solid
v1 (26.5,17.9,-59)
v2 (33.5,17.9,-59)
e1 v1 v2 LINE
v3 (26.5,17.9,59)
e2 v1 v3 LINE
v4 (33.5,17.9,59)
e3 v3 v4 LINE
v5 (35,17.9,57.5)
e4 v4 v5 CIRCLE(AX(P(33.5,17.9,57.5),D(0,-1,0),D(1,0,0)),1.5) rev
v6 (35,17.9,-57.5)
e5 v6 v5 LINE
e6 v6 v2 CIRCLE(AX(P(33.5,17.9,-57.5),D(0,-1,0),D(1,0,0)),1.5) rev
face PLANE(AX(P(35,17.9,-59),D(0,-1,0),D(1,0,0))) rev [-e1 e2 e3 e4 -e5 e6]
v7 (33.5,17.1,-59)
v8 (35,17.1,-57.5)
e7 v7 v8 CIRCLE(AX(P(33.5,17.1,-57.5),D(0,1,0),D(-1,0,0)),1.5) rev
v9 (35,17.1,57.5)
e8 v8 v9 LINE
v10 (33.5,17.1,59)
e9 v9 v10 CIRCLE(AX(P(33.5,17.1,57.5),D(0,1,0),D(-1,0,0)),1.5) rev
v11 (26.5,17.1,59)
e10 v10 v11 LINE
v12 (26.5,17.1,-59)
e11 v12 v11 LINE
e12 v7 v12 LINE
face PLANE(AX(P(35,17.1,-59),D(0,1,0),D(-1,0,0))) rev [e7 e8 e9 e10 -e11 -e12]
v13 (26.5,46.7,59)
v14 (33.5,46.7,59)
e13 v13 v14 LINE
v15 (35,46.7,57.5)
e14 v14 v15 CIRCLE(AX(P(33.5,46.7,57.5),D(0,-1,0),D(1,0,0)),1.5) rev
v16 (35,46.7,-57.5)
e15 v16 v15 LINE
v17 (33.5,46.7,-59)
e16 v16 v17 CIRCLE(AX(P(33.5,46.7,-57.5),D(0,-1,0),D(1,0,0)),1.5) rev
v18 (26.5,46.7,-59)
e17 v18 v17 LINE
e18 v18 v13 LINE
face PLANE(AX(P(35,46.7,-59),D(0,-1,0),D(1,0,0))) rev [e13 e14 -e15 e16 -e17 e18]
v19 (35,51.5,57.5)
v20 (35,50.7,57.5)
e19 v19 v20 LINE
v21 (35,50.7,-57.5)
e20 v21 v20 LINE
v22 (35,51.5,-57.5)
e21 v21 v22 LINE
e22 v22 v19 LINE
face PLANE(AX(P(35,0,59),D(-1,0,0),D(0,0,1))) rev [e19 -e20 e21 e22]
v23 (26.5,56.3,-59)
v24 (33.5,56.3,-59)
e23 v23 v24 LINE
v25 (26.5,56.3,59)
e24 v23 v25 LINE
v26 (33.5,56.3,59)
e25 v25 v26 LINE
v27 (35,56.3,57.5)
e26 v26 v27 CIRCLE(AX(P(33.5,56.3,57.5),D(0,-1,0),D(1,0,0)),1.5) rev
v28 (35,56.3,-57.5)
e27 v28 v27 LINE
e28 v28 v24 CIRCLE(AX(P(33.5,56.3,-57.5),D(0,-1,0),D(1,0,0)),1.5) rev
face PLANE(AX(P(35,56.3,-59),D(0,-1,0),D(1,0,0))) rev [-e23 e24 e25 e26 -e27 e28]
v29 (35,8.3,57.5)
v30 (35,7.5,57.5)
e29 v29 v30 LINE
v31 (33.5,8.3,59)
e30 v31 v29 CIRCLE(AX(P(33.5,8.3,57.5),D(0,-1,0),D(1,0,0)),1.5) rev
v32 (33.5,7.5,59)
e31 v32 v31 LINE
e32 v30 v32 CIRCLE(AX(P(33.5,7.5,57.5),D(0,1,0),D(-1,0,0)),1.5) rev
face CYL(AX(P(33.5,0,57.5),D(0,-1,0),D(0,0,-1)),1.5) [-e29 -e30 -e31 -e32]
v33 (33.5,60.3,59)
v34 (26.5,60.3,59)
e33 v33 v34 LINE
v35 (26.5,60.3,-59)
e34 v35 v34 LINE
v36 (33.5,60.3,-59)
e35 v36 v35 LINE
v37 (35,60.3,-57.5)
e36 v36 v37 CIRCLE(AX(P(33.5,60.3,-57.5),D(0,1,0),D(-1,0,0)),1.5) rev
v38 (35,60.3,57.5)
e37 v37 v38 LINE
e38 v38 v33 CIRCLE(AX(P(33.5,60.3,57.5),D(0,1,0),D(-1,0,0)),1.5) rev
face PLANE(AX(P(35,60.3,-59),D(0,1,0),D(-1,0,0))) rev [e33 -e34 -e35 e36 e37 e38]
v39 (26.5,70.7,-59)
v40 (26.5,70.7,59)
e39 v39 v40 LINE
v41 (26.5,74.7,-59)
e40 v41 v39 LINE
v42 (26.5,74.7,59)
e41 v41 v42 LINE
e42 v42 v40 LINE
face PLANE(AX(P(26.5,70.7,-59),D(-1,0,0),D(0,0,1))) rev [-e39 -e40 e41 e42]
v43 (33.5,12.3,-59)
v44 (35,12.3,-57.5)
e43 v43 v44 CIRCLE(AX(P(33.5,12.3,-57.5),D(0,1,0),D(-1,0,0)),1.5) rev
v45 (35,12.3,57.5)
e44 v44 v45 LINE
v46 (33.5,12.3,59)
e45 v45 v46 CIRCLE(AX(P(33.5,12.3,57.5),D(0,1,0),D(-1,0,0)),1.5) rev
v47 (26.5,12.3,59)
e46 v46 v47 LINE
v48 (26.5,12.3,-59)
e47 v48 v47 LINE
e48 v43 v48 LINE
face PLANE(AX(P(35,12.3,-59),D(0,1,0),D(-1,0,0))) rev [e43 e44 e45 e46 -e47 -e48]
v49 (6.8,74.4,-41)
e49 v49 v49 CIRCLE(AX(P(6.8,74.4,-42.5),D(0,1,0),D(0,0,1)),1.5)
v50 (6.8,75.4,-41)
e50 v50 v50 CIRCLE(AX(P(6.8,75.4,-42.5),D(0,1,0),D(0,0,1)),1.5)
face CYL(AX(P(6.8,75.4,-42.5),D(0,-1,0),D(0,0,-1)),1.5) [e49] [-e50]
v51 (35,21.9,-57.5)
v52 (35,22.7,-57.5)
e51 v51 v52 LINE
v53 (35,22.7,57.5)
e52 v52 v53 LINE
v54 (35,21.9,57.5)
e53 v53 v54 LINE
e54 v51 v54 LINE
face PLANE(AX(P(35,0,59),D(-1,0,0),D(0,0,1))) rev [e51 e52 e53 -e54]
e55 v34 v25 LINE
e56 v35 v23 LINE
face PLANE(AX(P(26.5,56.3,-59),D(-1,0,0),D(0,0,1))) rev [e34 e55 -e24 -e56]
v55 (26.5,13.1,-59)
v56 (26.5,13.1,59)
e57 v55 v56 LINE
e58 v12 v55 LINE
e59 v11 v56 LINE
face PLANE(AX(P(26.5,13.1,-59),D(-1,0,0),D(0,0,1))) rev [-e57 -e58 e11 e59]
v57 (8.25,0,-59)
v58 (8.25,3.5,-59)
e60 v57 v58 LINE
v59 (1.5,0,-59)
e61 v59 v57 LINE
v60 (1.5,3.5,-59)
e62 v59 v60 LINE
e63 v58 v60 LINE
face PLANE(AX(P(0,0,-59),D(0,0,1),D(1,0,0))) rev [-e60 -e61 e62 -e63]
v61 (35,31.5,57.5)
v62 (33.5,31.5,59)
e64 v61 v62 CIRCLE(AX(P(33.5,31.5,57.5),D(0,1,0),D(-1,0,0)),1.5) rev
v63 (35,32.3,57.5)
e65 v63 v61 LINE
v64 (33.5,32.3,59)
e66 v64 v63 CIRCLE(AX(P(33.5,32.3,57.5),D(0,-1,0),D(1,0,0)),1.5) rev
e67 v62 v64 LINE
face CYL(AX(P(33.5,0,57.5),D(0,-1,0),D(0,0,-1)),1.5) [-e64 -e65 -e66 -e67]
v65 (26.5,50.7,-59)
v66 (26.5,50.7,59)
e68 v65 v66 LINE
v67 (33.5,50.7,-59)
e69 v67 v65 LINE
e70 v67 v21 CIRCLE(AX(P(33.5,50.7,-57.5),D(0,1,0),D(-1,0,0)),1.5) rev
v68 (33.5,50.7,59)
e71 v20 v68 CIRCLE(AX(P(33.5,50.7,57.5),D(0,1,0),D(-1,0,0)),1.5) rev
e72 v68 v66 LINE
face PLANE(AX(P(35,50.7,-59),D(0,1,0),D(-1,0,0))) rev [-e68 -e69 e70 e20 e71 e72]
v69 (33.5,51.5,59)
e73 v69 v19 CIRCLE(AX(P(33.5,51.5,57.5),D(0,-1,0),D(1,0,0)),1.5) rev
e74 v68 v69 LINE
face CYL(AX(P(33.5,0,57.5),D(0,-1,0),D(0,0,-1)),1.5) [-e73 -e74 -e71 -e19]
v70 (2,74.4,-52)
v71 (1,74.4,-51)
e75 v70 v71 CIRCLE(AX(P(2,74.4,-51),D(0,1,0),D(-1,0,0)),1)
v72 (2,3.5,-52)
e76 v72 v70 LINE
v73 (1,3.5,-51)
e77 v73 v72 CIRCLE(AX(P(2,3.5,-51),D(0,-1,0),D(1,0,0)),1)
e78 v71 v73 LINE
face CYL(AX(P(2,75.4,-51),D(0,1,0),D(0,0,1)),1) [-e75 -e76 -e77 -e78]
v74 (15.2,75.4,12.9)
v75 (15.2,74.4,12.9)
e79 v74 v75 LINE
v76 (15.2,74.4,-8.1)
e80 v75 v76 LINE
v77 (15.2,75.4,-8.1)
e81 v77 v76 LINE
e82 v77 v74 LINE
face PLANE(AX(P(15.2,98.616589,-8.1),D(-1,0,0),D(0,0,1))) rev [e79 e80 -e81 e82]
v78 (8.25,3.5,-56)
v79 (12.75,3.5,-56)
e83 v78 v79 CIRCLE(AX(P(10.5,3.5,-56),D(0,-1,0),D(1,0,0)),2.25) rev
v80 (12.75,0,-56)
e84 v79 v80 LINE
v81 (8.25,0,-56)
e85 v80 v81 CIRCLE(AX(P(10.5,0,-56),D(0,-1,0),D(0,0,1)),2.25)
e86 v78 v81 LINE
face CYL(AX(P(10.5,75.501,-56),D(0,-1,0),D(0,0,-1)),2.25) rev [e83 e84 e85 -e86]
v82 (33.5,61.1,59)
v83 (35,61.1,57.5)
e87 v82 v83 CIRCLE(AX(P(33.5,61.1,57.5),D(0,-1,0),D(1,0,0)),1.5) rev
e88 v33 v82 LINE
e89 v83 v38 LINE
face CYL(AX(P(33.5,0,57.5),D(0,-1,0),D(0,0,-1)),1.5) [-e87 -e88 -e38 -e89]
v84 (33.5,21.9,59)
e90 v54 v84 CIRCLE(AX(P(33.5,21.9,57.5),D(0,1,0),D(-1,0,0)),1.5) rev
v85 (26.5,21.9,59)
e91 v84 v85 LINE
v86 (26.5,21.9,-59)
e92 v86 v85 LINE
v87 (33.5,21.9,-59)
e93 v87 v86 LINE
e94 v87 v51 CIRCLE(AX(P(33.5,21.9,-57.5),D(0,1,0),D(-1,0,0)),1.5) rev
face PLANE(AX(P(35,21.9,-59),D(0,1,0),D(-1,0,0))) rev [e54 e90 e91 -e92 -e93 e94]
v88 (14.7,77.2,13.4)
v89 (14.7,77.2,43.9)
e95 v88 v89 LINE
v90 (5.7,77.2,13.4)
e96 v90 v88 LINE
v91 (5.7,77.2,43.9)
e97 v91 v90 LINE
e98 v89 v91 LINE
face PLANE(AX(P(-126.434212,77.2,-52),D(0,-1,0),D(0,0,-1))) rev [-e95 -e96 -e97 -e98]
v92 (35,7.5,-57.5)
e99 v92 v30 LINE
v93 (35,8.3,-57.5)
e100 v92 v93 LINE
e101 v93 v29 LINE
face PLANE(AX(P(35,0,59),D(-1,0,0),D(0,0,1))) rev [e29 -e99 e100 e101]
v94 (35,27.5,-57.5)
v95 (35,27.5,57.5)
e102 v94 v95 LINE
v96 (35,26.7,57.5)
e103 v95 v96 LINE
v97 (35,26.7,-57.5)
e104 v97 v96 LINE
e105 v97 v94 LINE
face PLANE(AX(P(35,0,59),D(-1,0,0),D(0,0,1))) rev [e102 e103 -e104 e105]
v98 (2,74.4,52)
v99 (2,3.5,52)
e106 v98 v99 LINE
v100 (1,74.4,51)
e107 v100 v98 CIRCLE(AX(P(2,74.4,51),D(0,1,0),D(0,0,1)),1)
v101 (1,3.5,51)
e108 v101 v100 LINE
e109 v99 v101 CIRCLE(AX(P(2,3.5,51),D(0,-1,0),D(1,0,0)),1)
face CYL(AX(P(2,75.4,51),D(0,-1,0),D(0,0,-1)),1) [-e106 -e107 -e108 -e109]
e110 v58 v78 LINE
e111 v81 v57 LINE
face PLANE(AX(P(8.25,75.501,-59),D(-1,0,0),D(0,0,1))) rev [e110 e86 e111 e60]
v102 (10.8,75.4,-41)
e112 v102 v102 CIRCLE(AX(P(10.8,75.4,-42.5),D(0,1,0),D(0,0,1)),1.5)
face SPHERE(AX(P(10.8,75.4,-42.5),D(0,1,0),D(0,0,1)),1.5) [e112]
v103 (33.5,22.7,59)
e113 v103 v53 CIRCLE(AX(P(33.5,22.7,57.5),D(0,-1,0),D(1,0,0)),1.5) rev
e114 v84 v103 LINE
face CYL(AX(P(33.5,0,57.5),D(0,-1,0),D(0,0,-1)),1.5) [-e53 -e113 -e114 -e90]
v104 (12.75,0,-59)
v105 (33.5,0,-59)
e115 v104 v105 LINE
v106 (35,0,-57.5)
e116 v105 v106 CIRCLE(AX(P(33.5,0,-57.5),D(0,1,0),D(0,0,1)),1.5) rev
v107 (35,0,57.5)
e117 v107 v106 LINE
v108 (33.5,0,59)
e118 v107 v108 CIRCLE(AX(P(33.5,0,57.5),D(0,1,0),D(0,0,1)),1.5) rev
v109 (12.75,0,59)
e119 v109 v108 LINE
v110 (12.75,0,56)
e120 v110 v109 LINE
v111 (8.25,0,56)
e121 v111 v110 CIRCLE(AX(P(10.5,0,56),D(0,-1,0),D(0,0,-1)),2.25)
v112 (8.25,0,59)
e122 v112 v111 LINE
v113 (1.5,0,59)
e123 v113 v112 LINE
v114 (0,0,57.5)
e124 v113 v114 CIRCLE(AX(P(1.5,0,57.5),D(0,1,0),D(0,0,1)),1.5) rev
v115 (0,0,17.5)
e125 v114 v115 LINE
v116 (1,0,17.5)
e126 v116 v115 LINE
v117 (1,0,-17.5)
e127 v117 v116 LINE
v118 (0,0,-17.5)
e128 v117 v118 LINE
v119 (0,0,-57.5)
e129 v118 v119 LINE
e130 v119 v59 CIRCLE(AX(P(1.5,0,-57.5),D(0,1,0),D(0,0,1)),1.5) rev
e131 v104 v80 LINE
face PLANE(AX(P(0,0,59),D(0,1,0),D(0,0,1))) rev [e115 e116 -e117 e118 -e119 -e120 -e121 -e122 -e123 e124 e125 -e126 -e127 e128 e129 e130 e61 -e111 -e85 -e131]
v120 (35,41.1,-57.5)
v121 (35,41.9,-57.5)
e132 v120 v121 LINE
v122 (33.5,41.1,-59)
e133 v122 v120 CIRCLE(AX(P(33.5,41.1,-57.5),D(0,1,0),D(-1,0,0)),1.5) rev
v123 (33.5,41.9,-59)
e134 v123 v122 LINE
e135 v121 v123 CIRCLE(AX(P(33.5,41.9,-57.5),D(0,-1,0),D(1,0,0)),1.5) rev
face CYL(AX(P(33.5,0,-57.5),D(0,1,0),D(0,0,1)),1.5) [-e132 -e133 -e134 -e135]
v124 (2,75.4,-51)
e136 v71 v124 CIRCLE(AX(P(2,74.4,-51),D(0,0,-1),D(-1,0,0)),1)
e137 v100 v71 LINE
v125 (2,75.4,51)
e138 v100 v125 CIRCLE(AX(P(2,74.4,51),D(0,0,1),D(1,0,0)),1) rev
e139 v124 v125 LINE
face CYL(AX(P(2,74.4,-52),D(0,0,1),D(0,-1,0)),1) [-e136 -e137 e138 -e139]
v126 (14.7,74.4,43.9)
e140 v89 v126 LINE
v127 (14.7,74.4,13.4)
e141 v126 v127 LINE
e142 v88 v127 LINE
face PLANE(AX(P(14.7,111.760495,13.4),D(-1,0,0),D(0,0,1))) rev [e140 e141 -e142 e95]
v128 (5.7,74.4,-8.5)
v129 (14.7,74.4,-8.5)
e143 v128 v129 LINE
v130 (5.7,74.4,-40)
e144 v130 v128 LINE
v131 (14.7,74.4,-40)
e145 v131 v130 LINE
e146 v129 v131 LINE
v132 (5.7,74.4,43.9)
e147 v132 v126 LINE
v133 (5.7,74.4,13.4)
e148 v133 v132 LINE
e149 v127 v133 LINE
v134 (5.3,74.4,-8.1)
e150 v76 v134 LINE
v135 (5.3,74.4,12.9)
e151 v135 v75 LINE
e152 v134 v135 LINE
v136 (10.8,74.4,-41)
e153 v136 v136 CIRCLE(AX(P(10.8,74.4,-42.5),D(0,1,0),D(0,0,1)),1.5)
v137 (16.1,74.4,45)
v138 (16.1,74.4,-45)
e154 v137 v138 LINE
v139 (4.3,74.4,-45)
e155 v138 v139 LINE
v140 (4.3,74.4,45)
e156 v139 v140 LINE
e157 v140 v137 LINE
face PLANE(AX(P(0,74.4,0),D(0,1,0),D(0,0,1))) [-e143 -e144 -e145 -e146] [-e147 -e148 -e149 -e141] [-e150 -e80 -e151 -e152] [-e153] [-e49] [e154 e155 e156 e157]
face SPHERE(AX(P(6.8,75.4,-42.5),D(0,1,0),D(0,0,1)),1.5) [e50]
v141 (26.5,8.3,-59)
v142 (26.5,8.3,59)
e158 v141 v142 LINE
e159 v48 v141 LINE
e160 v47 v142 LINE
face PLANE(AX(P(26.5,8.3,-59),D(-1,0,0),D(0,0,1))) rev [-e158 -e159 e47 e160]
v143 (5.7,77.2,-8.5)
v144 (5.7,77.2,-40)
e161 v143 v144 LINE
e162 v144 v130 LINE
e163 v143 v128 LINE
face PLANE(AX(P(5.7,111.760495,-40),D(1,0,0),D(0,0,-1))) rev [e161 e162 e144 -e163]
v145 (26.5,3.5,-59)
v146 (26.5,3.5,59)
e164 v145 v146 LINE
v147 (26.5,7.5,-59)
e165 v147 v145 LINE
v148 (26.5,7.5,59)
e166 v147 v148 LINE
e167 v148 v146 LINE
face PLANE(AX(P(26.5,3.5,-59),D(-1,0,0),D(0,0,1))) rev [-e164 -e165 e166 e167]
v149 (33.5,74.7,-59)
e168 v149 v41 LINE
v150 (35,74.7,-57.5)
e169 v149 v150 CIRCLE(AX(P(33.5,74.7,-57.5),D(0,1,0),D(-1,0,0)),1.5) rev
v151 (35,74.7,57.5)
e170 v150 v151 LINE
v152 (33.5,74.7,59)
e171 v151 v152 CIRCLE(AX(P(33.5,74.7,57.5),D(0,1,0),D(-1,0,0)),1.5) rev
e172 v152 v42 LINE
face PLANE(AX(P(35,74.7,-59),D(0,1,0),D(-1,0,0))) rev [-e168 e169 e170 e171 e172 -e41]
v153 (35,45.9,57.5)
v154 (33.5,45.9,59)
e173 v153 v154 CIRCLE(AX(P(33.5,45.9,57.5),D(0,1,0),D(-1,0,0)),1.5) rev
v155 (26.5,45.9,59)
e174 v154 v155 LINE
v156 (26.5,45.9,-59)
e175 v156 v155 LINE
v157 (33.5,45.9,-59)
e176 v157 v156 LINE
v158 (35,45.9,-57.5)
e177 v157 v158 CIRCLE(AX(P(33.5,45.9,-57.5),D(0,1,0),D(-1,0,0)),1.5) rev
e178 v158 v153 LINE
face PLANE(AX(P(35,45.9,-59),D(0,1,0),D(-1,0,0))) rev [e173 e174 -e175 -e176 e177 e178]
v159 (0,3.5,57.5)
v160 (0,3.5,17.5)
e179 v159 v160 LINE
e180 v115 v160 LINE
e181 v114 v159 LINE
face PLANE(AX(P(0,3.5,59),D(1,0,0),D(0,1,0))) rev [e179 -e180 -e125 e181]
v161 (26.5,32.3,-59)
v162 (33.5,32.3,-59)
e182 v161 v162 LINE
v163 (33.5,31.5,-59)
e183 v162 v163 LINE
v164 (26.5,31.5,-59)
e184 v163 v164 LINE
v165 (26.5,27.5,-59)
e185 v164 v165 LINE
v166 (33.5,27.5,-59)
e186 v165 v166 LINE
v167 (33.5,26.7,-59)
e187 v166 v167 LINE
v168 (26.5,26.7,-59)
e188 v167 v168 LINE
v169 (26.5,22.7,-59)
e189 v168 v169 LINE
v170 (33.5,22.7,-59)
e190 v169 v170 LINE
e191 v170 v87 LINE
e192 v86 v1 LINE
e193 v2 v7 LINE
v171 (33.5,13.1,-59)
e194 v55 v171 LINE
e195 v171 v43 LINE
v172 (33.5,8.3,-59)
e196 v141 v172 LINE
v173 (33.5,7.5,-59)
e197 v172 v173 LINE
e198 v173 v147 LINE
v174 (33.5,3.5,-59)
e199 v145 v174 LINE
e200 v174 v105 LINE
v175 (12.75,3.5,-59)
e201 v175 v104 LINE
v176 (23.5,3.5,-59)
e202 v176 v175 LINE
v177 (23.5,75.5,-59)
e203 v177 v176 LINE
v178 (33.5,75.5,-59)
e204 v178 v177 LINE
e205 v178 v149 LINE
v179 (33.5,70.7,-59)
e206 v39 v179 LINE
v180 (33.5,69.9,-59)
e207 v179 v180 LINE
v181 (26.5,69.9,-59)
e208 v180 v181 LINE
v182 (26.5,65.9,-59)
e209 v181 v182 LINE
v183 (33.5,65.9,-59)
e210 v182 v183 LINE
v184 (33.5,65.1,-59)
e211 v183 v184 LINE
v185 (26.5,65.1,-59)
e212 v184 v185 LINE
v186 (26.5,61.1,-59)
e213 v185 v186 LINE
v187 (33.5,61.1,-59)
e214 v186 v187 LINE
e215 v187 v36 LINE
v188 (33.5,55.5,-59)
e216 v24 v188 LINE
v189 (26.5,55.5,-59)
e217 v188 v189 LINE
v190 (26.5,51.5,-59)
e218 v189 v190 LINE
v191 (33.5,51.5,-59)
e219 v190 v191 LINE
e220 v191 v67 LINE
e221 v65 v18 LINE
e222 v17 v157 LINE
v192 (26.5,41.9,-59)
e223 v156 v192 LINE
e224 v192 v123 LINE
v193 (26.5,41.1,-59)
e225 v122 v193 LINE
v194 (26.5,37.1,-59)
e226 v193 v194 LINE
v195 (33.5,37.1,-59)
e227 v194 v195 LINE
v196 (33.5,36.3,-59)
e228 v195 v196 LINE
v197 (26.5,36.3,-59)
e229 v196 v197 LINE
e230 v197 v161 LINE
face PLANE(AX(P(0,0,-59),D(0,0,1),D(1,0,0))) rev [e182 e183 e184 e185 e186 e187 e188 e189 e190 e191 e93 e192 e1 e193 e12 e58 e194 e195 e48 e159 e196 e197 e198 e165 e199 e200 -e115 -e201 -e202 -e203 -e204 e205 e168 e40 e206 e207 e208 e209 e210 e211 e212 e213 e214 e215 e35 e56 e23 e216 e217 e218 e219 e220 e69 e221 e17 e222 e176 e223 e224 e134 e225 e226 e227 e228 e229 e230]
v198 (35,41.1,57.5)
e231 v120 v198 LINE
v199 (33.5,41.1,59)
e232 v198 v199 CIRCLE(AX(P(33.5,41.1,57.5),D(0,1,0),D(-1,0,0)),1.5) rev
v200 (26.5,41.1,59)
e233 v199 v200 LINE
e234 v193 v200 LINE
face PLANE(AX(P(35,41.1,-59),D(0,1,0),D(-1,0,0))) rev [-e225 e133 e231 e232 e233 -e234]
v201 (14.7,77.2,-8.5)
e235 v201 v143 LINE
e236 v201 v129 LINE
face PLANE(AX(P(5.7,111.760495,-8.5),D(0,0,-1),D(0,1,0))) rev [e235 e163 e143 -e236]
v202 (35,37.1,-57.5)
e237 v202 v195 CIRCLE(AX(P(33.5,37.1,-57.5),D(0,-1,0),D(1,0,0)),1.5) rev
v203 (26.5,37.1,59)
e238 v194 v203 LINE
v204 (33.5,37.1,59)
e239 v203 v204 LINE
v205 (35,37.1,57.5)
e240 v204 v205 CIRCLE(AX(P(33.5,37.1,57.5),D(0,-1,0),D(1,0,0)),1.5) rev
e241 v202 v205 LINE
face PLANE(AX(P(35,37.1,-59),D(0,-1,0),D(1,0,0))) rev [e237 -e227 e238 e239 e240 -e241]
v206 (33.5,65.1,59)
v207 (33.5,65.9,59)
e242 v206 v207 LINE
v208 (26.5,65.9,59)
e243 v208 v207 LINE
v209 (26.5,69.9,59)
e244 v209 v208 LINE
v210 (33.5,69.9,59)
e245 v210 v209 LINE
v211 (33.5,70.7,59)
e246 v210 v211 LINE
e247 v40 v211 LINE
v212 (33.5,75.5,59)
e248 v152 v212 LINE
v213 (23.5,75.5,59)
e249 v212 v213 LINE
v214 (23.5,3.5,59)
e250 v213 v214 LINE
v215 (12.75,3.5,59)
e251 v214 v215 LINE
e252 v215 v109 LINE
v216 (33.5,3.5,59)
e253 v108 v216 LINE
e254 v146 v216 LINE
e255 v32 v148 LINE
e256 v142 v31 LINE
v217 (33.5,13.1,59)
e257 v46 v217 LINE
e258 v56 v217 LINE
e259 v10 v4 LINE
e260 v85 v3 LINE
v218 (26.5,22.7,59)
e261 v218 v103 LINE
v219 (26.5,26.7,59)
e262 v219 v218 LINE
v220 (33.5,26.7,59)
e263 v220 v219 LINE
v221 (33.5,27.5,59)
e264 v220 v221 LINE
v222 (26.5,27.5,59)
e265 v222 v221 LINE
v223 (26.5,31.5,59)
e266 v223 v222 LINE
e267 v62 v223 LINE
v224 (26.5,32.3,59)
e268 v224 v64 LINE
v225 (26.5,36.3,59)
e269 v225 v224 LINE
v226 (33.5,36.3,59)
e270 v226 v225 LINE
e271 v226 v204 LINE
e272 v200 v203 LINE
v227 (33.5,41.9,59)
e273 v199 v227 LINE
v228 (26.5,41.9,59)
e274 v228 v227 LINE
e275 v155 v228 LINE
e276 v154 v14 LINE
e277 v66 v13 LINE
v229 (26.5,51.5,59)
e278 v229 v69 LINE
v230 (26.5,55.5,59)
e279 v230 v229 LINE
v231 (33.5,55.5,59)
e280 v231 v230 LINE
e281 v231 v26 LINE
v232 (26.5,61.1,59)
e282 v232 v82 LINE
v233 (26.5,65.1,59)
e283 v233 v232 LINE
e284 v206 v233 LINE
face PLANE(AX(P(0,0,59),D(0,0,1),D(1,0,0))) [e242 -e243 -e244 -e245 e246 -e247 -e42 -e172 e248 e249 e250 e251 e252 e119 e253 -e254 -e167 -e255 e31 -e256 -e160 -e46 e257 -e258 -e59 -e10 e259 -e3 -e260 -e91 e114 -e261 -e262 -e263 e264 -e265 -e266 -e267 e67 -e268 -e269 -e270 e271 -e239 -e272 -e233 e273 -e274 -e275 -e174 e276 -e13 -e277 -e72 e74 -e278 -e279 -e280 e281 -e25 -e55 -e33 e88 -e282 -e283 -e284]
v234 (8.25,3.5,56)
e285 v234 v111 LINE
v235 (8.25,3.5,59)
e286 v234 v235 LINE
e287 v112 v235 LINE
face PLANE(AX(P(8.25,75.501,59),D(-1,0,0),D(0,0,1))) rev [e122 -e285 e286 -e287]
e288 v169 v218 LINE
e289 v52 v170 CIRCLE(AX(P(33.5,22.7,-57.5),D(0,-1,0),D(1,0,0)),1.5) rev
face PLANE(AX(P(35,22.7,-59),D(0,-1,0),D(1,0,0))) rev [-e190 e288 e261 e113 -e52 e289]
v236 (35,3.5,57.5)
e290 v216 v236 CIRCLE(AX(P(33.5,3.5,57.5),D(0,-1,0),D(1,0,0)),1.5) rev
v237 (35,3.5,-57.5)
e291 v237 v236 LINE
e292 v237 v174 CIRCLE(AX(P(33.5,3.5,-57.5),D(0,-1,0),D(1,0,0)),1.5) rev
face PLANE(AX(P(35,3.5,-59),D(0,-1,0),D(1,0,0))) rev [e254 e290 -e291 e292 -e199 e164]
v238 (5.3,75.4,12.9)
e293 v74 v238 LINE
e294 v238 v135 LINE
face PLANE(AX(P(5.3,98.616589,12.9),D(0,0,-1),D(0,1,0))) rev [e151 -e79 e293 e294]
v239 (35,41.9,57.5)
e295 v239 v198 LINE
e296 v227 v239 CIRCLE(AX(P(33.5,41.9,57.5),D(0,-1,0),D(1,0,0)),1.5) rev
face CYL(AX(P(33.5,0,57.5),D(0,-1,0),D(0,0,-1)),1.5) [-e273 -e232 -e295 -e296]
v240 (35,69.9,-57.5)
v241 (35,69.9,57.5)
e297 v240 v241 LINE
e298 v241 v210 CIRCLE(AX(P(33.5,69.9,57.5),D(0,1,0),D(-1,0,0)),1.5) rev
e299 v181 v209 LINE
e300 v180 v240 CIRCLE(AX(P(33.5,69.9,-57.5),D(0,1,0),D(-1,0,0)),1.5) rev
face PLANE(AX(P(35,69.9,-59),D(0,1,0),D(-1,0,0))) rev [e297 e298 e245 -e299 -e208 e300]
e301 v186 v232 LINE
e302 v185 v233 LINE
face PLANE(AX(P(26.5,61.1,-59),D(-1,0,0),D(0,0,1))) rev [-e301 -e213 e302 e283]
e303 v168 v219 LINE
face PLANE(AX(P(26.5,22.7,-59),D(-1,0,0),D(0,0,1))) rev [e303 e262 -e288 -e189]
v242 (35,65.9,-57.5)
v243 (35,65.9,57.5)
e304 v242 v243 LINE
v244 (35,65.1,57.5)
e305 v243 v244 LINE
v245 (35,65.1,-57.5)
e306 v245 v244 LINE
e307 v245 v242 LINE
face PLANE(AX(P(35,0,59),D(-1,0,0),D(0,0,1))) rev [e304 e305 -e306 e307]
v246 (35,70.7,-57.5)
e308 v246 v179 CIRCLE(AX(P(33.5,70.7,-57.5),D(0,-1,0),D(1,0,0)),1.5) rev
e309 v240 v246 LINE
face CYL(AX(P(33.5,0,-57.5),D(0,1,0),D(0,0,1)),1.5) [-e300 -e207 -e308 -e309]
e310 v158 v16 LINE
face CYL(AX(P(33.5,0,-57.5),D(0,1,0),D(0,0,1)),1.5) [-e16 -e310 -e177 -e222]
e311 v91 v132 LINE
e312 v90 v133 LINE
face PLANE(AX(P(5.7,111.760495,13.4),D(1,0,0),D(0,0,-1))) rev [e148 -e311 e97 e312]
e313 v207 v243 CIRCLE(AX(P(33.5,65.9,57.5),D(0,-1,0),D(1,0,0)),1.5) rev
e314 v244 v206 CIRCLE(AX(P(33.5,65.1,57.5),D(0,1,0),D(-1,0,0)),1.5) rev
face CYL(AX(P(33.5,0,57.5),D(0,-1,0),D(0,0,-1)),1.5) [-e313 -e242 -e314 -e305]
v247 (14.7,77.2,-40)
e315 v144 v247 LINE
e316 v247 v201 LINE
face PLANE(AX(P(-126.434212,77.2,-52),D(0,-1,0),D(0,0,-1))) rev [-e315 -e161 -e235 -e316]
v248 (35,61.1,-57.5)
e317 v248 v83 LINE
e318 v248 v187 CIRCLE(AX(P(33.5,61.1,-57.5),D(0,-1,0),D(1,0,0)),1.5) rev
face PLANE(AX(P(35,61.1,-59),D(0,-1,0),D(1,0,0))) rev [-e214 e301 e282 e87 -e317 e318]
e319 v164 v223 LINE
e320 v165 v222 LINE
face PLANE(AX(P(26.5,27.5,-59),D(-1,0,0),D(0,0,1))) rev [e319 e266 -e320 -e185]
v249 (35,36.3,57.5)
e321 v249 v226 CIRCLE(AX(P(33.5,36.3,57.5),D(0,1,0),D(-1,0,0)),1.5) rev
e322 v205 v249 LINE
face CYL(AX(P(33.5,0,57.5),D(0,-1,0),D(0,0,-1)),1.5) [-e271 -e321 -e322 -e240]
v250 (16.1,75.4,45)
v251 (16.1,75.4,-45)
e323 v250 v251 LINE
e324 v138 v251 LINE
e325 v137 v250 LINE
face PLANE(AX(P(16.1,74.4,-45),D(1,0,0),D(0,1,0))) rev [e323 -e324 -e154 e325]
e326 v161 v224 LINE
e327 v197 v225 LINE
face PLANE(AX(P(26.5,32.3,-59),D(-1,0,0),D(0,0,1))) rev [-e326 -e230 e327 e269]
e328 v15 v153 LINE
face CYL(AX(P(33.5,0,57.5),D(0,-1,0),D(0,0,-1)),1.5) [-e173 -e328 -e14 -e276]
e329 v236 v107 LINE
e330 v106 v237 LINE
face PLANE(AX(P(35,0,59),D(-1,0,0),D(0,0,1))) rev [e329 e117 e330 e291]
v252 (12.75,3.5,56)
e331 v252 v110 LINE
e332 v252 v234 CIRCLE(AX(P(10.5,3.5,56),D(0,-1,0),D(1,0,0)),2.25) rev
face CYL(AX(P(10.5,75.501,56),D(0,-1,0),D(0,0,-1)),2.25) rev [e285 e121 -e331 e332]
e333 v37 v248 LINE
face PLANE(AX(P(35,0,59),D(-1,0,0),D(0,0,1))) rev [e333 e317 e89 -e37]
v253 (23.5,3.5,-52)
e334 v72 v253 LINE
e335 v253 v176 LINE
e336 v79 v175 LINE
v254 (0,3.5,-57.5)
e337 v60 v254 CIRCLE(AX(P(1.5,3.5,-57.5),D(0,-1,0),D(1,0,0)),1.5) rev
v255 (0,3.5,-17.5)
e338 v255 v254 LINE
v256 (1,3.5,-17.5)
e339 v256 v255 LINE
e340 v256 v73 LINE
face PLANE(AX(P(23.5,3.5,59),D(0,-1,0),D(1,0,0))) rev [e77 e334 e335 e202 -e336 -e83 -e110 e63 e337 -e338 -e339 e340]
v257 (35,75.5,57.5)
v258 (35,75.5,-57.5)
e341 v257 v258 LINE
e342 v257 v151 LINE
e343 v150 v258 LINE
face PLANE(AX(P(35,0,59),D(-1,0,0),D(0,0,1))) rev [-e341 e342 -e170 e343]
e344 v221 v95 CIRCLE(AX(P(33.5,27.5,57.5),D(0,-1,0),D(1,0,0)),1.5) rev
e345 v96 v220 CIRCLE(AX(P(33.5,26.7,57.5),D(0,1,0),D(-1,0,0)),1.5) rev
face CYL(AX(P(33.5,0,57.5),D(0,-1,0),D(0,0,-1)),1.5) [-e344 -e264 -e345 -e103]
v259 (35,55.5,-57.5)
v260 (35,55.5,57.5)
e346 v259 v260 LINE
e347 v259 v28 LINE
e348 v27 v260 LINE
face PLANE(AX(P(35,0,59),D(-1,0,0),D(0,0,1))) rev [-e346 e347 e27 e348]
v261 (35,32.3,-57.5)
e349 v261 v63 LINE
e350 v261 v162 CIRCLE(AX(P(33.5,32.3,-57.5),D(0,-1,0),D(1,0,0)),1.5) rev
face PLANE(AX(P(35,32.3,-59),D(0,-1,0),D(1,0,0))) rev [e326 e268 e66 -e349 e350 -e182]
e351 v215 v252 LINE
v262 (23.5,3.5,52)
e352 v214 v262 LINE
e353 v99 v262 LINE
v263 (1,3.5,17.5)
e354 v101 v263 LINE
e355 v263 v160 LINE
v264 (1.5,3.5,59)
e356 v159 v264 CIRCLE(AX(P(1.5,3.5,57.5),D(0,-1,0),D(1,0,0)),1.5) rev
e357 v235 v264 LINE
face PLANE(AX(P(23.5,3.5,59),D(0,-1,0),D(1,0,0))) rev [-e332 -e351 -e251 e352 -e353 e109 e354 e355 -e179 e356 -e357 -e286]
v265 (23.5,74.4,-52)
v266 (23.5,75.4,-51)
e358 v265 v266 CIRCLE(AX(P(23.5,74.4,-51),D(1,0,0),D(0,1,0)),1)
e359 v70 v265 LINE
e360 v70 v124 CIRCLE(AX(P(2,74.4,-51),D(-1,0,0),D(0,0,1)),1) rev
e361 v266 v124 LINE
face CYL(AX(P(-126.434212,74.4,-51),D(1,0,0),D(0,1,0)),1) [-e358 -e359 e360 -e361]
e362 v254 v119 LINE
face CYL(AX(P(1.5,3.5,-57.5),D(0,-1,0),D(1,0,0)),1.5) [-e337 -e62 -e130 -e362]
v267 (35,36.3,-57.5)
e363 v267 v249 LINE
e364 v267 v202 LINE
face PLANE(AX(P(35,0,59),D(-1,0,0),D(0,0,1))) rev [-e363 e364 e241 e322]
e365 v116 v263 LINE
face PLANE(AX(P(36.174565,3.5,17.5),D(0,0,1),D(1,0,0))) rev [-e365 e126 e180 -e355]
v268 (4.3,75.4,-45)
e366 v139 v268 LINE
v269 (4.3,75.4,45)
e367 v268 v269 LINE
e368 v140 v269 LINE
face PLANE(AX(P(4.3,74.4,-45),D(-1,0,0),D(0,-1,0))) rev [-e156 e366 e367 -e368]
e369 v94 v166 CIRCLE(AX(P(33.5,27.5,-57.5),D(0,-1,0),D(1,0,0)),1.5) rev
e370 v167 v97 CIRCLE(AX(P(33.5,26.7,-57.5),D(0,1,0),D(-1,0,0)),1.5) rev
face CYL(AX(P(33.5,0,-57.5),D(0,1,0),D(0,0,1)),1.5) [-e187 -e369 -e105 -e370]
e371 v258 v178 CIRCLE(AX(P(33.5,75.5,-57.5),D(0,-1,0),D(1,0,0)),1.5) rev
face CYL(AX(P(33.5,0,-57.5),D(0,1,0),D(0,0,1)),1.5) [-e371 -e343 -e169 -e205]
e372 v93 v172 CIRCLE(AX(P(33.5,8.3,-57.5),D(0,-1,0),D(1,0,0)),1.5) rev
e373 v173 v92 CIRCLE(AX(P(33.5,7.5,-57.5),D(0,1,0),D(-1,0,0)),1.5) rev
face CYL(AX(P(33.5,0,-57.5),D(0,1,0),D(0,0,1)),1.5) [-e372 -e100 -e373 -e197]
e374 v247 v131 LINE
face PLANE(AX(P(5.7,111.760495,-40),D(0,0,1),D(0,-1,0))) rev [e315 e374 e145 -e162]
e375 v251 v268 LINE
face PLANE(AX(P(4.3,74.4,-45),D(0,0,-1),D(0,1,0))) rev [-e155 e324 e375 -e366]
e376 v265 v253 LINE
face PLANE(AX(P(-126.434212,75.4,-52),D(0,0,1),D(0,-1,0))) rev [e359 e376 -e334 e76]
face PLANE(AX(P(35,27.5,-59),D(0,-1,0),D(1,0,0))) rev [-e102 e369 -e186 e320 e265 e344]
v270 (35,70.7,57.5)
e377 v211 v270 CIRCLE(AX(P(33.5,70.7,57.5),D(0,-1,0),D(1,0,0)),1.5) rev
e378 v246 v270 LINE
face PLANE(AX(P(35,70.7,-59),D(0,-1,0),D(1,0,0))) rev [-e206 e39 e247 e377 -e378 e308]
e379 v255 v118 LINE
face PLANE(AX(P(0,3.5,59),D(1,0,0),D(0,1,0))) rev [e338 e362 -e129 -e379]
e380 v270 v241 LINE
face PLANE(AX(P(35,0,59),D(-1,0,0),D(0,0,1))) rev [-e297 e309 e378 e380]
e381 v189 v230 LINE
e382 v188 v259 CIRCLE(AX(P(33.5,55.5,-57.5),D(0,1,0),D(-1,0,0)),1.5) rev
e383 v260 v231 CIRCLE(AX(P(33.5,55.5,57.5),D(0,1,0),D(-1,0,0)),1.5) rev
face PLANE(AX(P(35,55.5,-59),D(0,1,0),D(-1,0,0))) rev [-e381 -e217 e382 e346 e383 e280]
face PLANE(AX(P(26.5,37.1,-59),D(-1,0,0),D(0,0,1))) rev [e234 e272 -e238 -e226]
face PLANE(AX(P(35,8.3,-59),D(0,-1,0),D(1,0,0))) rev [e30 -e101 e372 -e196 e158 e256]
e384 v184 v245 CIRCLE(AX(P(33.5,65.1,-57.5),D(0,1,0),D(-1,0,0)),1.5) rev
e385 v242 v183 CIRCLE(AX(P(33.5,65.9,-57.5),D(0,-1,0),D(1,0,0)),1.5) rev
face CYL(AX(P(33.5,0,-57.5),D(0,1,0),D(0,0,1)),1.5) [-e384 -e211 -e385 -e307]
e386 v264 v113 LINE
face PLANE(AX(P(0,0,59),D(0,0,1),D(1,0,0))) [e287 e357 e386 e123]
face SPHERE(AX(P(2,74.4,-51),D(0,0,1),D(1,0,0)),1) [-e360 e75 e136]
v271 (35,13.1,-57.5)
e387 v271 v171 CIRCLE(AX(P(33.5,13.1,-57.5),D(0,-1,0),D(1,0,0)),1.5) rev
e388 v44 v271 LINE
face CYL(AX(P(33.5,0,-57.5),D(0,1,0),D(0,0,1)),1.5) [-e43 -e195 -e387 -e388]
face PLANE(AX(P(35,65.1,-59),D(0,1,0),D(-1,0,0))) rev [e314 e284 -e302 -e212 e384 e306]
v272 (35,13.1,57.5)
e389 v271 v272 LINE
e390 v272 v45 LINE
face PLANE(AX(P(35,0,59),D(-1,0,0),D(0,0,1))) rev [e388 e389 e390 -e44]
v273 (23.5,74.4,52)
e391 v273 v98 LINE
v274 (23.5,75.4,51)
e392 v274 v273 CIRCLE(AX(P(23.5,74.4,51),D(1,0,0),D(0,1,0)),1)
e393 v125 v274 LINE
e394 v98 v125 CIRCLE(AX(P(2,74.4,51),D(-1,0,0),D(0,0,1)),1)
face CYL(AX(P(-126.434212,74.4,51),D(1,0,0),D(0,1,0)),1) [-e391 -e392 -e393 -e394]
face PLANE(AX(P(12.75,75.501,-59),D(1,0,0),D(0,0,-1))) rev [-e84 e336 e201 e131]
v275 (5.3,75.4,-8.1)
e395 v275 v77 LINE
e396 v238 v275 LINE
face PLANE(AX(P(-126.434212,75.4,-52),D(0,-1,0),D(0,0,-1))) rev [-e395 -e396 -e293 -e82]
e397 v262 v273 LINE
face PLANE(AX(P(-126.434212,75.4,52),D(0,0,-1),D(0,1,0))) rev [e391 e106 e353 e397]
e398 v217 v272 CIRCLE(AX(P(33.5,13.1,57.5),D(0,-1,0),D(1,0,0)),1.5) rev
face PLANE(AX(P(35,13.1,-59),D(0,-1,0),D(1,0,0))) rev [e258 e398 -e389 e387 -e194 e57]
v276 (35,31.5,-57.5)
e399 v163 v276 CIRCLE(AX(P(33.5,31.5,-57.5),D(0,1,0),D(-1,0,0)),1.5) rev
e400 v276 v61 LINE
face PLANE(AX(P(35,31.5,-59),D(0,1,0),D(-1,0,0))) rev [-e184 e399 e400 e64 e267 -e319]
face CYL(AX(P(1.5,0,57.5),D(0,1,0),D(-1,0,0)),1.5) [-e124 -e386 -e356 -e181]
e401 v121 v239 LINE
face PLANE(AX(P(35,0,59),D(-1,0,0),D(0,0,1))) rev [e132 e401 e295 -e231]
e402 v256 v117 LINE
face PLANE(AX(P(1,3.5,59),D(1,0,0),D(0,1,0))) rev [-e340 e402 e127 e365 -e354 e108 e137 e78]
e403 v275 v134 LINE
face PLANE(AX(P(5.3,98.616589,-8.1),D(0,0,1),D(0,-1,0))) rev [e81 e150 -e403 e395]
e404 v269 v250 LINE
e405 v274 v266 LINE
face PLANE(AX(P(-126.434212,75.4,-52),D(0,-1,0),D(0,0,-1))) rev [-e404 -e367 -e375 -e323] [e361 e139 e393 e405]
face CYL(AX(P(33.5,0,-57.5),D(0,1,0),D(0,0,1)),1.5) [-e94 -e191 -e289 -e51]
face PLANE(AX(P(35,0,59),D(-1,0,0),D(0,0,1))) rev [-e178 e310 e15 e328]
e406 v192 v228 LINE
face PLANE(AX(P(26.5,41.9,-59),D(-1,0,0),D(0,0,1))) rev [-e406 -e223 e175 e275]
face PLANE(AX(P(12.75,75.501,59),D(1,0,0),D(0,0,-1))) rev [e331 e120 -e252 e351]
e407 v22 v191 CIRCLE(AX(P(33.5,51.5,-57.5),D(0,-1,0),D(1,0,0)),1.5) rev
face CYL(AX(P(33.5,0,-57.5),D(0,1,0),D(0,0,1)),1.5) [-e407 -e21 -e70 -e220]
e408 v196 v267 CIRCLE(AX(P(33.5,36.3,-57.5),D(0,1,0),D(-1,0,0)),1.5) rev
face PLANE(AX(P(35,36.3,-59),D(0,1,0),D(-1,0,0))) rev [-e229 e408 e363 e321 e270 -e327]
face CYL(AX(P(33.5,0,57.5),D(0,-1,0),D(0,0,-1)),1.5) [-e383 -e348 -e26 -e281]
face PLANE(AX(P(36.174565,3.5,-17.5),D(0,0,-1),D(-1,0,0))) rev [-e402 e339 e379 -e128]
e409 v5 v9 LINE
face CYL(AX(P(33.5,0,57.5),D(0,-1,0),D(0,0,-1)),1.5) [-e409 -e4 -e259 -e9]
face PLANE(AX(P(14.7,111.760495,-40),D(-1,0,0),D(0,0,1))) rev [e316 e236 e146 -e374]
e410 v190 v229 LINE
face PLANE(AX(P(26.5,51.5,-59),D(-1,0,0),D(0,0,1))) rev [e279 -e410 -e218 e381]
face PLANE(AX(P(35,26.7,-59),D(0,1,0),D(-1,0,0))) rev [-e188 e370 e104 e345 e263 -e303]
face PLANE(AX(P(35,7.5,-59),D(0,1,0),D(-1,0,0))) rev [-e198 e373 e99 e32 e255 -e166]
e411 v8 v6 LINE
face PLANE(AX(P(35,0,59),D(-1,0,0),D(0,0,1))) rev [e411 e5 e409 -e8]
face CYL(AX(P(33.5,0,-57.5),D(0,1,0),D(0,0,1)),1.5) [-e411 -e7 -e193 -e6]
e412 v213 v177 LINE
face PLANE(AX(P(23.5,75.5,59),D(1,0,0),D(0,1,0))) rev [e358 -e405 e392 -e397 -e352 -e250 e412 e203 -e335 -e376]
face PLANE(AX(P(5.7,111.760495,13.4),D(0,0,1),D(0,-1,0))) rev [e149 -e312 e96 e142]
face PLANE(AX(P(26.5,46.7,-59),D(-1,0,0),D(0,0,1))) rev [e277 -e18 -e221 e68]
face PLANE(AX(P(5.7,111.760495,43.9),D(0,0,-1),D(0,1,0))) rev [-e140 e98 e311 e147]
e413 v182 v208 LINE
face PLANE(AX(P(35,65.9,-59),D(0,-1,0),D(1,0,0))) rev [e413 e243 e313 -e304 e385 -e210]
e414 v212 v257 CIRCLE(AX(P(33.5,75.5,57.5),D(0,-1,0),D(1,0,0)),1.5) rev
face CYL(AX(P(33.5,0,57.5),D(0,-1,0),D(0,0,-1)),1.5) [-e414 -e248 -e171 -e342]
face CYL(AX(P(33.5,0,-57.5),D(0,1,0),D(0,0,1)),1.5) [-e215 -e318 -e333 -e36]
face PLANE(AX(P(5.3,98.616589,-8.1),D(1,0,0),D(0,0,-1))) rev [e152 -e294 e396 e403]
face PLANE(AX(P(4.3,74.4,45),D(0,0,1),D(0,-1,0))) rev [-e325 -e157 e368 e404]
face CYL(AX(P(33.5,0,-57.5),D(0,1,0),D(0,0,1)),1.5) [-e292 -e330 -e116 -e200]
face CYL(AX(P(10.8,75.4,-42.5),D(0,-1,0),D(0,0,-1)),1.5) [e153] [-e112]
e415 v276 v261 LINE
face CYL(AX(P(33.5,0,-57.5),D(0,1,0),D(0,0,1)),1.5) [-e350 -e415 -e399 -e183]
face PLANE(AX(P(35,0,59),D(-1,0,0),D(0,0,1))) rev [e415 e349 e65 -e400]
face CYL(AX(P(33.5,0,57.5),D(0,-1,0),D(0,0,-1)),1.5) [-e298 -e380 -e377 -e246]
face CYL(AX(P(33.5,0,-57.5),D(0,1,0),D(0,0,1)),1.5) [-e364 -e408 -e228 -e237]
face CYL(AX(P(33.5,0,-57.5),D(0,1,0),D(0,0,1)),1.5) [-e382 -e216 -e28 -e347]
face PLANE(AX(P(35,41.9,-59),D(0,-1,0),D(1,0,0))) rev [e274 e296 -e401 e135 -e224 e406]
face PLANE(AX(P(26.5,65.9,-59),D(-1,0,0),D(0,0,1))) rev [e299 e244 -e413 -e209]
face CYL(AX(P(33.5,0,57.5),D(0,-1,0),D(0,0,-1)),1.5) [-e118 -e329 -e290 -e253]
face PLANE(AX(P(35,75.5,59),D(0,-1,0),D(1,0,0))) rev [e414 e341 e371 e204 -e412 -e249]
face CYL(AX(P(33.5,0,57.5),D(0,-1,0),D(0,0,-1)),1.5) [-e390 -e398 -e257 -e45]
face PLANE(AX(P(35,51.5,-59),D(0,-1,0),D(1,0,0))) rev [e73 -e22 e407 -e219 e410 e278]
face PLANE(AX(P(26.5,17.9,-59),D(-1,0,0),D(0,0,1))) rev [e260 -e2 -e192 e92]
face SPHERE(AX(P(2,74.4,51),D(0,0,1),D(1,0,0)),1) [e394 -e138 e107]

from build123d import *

# Parameters (mm, degrees)
BOSS_EXTRUDE1_DEPTH = 59
FILLET1_R           = 1.5
SKETCH2_W           = 8.5
SKETCH2_H           = 4
CUT_EXTRUDE1_DEPTH  = 145.392693721
LPATTERN1_COUNT     = 15
LPATTERN1_PITCH     = 4.8
SKETCH3_W           = 104
SKETCH3_H           = 71.9
BOSS_EXTRUDE2_DEPTH = 22.5
SKETCH4_W           = 35
SKETCH4_H           = 3.5
CUT_EXTRUDE2_DEPTH  = 1
CUT_EXTRUDE3_REACH  = 104.011
SKETCH8_W           = 11.8
SKETCH8_H           = 90
CUT_EXTRUDE4_DEPTH  = 1
SKETCH9_W           = 9
SKETCH9_H           = 30.5
SKETCH9_H_2         = 31.5
BOSS_EXTRUDE4_DEPTH = 2.8
SKETCH10_W          = 9.9
SKETCH10_H          = 21
BOSS_EXTRUDE5_DEPTH = 1
SKETCH11_R          = 1.5
BOSS_EXTRUDE6_DEPTH = 1
FILLET2_R           = 1


# Read off the part's stored shape, not the designer's step: Dome1, Dome2
with BuildPart() as part:
    # Sketch1 → Boss-Extrude1 (new, symmetric)
    with BuildSketch(Plane.XY):
        Polygon((0, 0), (35, 0), (35, 75.5), (23.5, 75.5), (23.5, 3.5), (0, 3.5), align=None)
    extrude(amount=BOSS_EXTRUDE1_DEPTH, both=True)

    # Fillet1
    fillet1_edges = [part.edges().sort_by_distance(p)[0] for p in [
        (35, 37.75, 59),
        (0, 1.75, 59),
        (35, 37.75, -59),
        (0, 1.75, -59),
    ]]
    fillet(fillet1_edges, radius=FILLET1_R)

    # Sketch2 → Cut-Extrude1 (cut, through all)
    with BuildSketch(Plane.XY.offset(59)):
        with Locations((30.75, 5.5)):
            Rectangle(SKETCH2_W, SKETCH2_H)
    cut_extrude1 = extrude(amount=-CUT_EXTRUDE1_DEPTH, mode=Mode.SUBTRACT)

    # LPattern1: Cut-Extrude1 ×15
    with Locations(*[(0, i * LPATTERN1_PITCH, 0) for i in range(1, LPATTERN1_COUNT)]):
        add(cut_extrude1, mode=Mode.SUBTRACT)

    # Sketch3 → Boss-Extrude2 (add)
    with BuildSketch(Plane.ZY.offset(-23.5)):
        with Locations((0, 39.45)):
            Rectangle(SKETCH3_W, SKETCH3_H)
    extrude(amount=BOSS_EXTRUDE2_DEPTH)

    # Sketch4 → Cut-Extrude2 (cut)
    with BuildSketch(Plane.ZY):
        with Locations((0, 1.75)):
            Rectangle(SKETCH4_W, SKETCH4_H)
    extrude(amount=-CUT_EXTRUDE2_DEPTH, mode=Mode.SUBTRACT)

    # Sketch5 → Cut-Extrude3 (cut, up to next)
    with BuildSketch(Plane.XZ, mode=Mode.PRIVATE) as cut_extrude3_sk1:
        with BuildLine():
            Line((12.75, 59), (12.75, 56))
            ThreePointArc((12.75, 56), (10.5, 53.75), (8.25, 56))
            Line((8.25, 56), (8.25, 59))
            ThreePointArc((8.25, 59), (10.5, 61.25), (12.75, 59))
        make_face()
    cut_extrude3_tool1 = extrude(cut_extrude3_sk1.sketch, amount=-CUT_EXTRUDE3_REACH, mode=Mode.PRIVATE) & part.part
    # Sketch5 → Cut-Extrude3 (cut, up to next)
    with BuildSketch(Plane.XZ, mode=Mode.PRIVATE) as cut_extrude3_sk2:
        with BuildLine():
            Line((12.75, -59), (12.75, -56))
            ThreePointArc((12.75, -56), (10.5, -53.75), (8.25, -56))
            Line((8.25, -56), (8.25, -59))
            ThreePointArc((8.25, -59), (10.5, -61.25), (12.75, -59))
        make_face()
    cut_extrude3_tool2 = extrude(cut_extrude3_sk2.sketch, amount=-CUT_EXTRUDE3_REACH, mode=Mode.PRIVATE) & part.part
    add(cut_extrude3_tool1.solids().sort_by_distance((10.5, 0, 57.5))[0], mode=Mode.SUBTRACT)
    add(cut_extrude3_tool2.solids().sort_by_distance((10.5, 0, -57.5))[0], mode=Mode.SUBTRACT)

    # Sketch8 → Cut-Extrude4 (cut)
    with BuildSketch(Plane(origin=(0, 75.4, 0), x_dir=(1, 0, 0), z_dir=(0, 1, 0))):
        with Locations((10.2, 0)):
            Rectangle(SKETCH8_W, SKETCH8_H)
    extrude(amount=-CUT_EXTRUDE4_DEPTH, mode=Mode.SUBTRACT)

    # Sketch9 → Boss-Extrude4 (add)
    with BuildSketch(Plane(origin=(0, 74.4, 0), x_dir=(1, 0, 0), z_dir=(0, 1, 0))):
        with Locations((10.2, -28.65)):
            Rectangle(SKETCH9_W, SKETCH9_H)
        with Locations((10.2, 24.25)):
            Rectangle(SKETCH9_W, SKETCH9_H_2)
    extrude(amount=BOSS_EXTRUDE4_DEPTH)

    # Sketch10 → Boss-Extrude5 (add)
    with BuildSketch(Plane(origin=(0, 74.4, 0), x_dir=(1, 0, 0), z_dir=(0, 1, 0))):
        with Locations((10.25, -2.4)):
            Rectangle(SKETCH10_W, SKETCH10_H)
    extrude(amount=BOSS_EXTRUDE5_DEPTH)

    # Sketch11 → Boss-Extrude6 (add)
    with BuildSketch(Plane(origin=(0, 74.4, 0), x_dir=(1, 0, 0), z_dir=(0, 1, 0))):
        with Locations(Location((6.8, 42.5, 0), (0, 0, 270))):
            Circle(SKETCH11_R)
        with Locations(Location((10.8, 42.5, 0), (0, 0, 270))):
            Circle(SKETCH11_R)
    extrude(amount=BOSS_EXTRUDE6_DEPTH)

    # Dome1 outline → Dome1 (revolve)
    with BuildSketch(Plane(origin=(10.8, 0, -42.5), x_dir=(1, 0, 0), z_dir=(0, 0, 1))):
        with BuildLine():
            Line((0, 75.4), (1.5, 75.399999999))
            ThreePointArc((1.5, 75.399999999), (1.060660172, 76.460660171), (0, 76.9))
            Line((0, 76.9), (0, 75.4))
        make_face()
    revolve(axis=Axis((10.8, 0, -42.5), (0, 1, 0)))

    # Dome2 outline → Dome2 (revolve)
    with BuildSketch(Plane(origin=(6.8, 0, -42.5), x_dir=(1, 0, 0), z_dir=(0, 0, 1))):
        with BuildLine():
            Line((0, 75.4), (1.5, 75.399999999))
            ThreePointArc((1.5, 75.399999999), (1.060660172, 76.460660171), (0, 76.9))
            Line((0, 76.9), (0, 75.4))
        make_face()
    revolve(axis=Axis((6.8, 0, -42.5), (0, 1, 0)))

    # Fillet2
    fillet2_edges = [part.edges().sort_by_distance(p)[0] for p in [
        (1, 75.4, 0),
        (12.25, 75.4, 52),
        (1, 39.45, 52),
        (1, 39.45, -52),
        (12.25, 75.4, -52),
    ]]
    fillet(fillet2_edges, radius=FILLET2_R)


solid = part.part
